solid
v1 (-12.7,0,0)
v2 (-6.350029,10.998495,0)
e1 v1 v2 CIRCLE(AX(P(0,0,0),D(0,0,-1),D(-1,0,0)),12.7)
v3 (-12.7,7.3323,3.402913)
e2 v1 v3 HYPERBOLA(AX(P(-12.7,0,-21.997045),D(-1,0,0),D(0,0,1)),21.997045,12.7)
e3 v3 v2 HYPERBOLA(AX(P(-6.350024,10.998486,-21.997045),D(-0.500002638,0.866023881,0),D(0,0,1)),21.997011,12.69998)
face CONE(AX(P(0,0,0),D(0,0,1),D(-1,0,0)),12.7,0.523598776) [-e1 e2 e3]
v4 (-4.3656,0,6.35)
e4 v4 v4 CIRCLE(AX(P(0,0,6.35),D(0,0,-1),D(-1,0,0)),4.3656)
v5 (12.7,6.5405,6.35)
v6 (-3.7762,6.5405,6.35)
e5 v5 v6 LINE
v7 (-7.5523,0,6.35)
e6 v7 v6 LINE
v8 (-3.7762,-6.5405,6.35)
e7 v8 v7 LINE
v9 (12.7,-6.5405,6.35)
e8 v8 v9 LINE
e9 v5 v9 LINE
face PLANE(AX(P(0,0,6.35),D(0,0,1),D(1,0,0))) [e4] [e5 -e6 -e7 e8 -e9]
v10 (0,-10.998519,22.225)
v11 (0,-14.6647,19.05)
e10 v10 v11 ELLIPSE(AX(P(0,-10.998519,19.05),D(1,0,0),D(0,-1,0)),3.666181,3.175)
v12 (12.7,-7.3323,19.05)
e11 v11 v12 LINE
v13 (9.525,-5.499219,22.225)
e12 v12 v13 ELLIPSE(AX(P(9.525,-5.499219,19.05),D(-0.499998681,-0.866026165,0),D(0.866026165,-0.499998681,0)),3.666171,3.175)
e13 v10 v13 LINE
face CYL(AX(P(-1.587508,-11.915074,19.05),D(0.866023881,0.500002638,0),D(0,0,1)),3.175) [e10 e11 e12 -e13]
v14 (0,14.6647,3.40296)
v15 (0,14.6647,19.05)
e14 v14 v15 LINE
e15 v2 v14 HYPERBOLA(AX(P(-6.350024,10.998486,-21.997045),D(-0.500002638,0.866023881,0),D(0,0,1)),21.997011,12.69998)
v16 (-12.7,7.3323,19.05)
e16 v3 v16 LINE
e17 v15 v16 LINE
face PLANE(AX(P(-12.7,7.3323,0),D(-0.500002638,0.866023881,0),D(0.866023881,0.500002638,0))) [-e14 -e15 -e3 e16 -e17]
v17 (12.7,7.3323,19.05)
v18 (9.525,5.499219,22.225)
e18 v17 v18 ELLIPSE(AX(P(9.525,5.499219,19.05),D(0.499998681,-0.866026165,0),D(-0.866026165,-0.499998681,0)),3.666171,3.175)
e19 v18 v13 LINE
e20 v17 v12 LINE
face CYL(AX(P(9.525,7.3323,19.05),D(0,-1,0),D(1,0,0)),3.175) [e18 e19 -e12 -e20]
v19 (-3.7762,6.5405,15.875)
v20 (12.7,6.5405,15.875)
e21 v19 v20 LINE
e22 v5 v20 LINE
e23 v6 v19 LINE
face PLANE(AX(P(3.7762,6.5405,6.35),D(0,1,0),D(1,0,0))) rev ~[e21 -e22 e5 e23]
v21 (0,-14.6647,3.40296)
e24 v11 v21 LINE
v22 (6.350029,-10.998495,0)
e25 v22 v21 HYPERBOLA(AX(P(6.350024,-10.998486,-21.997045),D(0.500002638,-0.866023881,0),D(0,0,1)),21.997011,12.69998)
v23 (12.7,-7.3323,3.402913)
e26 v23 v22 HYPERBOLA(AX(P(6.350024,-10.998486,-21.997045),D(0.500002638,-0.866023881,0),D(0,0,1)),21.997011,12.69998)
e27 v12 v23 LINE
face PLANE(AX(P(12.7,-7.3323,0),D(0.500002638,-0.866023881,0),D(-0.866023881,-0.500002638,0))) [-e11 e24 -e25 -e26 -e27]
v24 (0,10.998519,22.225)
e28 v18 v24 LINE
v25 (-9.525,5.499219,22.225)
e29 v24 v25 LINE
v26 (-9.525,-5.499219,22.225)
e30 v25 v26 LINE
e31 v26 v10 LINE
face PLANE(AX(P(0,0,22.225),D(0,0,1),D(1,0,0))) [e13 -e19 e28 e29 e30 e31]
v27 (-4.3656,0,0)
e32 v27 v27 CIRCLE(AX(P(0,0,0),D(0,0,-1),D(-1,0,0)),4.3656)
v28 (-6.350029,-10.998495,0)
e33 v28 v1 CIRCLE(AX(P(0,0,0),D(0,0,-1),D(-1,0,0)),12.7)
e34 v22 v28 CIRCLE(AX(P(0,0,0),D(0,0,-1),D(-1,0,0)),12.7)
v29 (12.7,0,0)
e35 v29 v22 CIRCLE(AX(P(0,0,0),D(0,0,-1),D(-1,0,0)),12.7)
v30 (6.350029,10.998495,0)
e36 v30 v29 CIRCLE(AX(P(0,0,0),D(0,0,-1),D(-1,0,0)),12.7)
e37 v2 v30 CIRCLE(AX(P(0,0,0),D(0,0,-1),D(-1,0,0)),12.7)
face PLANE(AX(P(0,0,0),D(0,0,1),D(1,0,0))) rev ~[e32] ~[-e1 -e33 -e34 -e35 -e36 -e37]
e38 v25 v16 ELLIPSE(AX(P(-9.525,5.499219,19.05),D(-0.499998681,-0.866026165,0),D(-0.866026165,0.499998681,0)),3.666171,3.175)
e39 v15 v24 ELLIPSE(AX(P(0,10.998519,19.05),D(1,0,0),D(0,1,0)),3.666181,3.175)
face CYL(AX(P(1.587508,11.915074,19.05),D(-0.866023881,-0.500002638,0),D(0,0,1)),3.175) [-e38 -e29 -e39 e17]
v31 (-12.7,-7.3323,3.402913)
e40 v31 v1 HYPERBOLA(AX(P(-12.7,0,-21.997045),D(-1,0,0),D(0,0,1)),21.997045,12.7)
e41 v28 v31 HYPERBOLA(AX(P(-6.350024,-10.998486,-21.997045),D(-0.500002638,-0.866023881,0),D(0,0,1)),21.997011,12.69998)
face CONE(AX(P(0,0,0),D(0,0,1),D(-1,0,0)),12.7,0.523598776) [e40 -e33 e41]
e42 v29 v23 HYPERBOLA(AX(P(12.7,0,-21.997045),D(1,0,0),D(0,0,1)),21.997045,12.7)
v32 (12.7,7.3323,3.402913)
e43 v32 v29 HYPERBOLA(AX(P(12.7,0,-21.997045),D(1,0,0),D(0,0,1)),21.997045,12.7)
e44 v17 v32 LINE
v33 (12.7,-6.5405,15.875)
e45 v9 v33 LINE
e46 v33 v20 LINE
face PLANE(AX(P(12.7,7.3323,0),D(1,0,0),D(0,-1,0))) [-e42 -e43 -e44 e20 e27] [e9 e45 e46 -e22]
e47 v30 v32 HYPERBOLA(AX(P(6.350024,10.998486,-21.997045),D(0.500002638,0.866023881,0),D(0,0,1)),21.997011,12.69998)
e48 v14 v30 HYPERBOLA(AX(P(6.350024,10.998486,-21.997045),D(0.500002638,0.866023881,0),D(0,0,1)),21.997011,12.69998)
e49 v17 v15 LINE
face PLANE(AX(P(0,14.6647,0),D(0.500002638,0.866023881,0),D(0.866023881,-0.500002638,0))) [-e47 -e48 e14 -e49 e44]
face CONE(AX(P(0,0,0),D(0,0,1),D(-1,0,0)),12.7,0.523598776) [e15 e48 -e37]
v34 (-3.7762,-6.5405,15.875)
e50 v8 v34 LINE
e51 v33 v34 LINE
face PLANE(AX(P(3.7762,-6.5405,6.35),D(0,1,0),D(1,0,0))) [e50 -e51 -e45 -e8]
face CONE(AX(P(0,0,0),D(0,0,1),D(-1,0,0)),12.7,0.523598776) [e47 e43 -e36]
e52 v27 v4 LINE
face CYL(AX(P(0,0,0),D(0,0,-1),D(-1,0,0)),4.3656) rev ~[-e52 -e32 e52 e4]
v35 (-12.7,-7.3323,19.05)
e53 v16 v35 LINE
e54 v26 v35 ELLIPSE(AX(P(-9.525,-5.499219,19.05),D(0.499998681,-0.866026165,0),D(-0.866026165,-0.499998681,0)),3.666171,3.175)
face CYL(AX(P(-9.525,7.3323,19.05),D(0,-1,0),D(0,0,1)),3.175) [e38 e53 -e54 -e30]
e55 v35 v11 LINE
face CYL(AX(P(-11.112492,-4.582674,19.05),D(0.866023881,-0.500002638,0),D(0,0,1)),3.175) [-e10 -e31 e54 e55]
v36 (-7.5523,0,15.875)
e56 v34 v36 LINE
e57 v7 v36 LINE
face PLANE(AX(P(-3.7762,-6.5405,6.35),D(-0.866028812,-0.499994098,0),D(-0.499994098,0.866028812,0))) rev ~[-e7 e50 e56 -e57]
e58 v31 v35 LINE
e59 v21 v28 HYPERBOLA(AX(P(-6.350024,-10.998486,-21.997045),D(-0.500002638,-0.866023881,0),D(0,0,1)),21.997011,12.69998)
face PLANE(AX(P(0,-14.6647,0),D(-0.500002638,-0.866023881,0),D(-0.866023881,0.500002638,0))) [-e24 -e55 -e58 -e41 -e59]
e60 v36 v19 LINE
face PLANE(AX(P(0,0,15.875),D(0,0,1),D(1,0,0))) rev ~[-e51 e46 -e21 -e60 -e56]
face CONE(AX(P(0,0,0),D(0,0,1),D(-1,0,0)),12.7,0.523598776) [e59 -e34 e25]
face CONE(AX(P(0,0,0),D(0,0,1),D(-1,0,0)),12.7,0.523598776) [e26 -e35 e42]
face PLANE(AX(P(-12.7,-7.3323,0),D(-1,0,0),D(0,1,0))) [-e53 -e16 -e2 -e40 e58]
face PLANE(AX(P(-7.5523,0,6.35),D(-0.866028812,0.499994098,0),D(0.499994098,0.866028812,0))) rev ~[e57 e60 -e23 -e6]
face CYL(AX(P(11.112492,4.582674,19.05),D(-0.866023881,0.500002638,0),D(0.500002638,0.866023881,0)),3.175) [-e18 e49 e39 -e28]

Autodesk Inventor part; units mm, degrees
ref_plane "YZ Plane" through (0, 0, 0) normal (1, 0, 0) x (0, 1, 0)
ref_plane "XZ Plane" through (0, 0, 0) normal (0, 1, 0) x (-1, 0, 0)
ref_plane "XY Plane" through (0, 0, 0) normal (0, 0, 1) x (1, 0, 0)
sketch "Sketch1" plane through (0, 0, 0) normal (0, 0, 1) x (1, 0, 0)
  line L0 (0, 14.6647) -> (12.7, 7.3323)
  line L1 (12.7, 7.3323) -> (12.7, -7.3323)
  line L2 (12.7, -7.3323) -> (0, -14.6647)
  line L3 (0, -14.6647) -> (-12.7, -7.3323)
  line L4 (-12.7, -7.3323) -> (-12.7, 7.3323)
  line L5 (-12.7, 7.3323) -> (0, 14.6647)
  point P0 (0, 0)
  point P1 (0, 0)
  dimension "d0" = 25.4
extrude "Extrusion1" add sketch "Sketch1" along normal blind 6.35
sketch "Sketch2" plane through (0, 0, 6.35) normal (0, 0, 1) x (1, 0, 0)
  line L0 (12.7, 7.3323) -> (0, 14.6647) projected
  line L1 (0, 14.6647) -> (-12.7, 7.3323) projected
  line L2 (-12.7, 7.3323) -> (-12.7, -7.3323) projected
  line L3 (-12.7, -7.3323) -> (0, -14.6647) projected
  line L4 (0, -14.6647) -> (12.7, -7.3323) projected
  line L5 (12.7, -7.3323) -> (12.7, 7.3323) projected
  line L6 (7.5523, 0) -> (3.7762, -6.5405)
  line L7 (3.7762, -6.5405) -> (-3.7762, -6.5405)
  line L8 (-3.7762, -6.5405) -> (-7.5523, 0)
  line L9 (-7.5523, 0) -> (-3.7762, 6.5405)
  line L10 (-3.7762, 6.5405) -> (3.7762, 6.5405)
  line L11 (3.7762, 6.5405) -> (7.5523, 0)
  line L12 (3.7762, 6.5405) -> (12.7, 6.5405)
  line L13 (3.7762, -6.5405) -> (12.7, -6.5405)
  point P0 (0, 0)
  point P1 (0, 0)
  dimension "d3" = 13.081
extrude "Extrusion2" add sketch "Sketch2" along normal blind 9.525 contours L5 L12 L10 L9 L8 L7 L13 L4 L3 L2 L1 L0
sketch "Sketch3" plane through (0, 0, 15.875) normal (0, 0, 1) x (1, 0, 0)
  line L0 (12.7, 7.3323) -> (0, 14.6647) projected
  line L1 (0, 14.6647) -> (-12.7, 7.3323) projected
  line L2 (-12.7, 7.3323) -> (-12.7, -7.3323) projected
  line L3 (-12.7, -7.3323) -> (0, -14.6647) projected
  line L4 (0, -14.6647) -> (12.7, -7.3323) projected
  line L5 (12.7, -7.3323) -> (12.7, -6.5405) projected
  line L6 (12.7, -6.5405) -> (-3.7762, -6.5405) projected
  line L7 (-3.7762, -6.5405) -> (-7.5523, 0) projected
  line L8 (-7.5523, 0) -> (-3.7762, 6.5405) projected
  line L9 (-3.7762, 6.5405) -> (12.7, 6.5405) projected
  line L10 (12.7, 6.5405) -> (12.7, 7.3323) projected
  line L11 (12.7, 6.5405) -> (12.7, -6.5405)
  point P0 (0, 0)
extrude "Extrusion3" add sketch "Sketch3" along normal blind 6.35
sketch "Sketch4" plane through (0, 0, 0) normal (0, 0, -1) x (-1, 0, 0)
  circle A0 centre (0, 0) radius 12.7
  line L0 (0, 14.6647) -> (-12.7, 7.3323) projected
extrude "Extrusion4" cut sketch "Sketch4" against normal through all draft 30 keep common part
sketch "Sketch5" plane through (0, 0, 0) normal (0, 0, -1) x (-1, 0, 0)
  circle A0 centre (0, 0) radius 12.7
  circle A1 centre (0, 0) radius 4.3656
  arc A2 (-12.7, 0) -> (-6.35, -10.9985) centre (0, 0) ccw projected
  arc A3 (-6.35, -10.9985) -> (6.35, -10.9985) centre (0, 0) ccw projected
  arc A4 (6.35, -10.9985) -> (12.7, 0) centre (0, 0) ccw projected
  arc A5 (12.7, 0) -> (6.35, 10.9985) centre (0, 0) ccw projected
  arc A6 (6.35, 10.9985) -> (-6.35, 10.9985) centre (0, 0) ccw projected
  arc A7 (-6.35, 10.9985) -> (-12.7, 0) centre (0, 0) ccw projected
  dimension "d13" = 8.7312
extrude "Extrusion5" cut sketch "Sketch5" against normal up to next contours A1
fillet "Fillet1" radius 3.175 6 edges at (12.7, 0, 22.225) (6.35, 10.9985, 22.225) (-6.35, 10.9985, 22.225) (-12.7, 0, 22.225) (-6.35, -10.9985, 22.225) (6.35, -10.9985, 22.225)
properties part number "bottom nut"
